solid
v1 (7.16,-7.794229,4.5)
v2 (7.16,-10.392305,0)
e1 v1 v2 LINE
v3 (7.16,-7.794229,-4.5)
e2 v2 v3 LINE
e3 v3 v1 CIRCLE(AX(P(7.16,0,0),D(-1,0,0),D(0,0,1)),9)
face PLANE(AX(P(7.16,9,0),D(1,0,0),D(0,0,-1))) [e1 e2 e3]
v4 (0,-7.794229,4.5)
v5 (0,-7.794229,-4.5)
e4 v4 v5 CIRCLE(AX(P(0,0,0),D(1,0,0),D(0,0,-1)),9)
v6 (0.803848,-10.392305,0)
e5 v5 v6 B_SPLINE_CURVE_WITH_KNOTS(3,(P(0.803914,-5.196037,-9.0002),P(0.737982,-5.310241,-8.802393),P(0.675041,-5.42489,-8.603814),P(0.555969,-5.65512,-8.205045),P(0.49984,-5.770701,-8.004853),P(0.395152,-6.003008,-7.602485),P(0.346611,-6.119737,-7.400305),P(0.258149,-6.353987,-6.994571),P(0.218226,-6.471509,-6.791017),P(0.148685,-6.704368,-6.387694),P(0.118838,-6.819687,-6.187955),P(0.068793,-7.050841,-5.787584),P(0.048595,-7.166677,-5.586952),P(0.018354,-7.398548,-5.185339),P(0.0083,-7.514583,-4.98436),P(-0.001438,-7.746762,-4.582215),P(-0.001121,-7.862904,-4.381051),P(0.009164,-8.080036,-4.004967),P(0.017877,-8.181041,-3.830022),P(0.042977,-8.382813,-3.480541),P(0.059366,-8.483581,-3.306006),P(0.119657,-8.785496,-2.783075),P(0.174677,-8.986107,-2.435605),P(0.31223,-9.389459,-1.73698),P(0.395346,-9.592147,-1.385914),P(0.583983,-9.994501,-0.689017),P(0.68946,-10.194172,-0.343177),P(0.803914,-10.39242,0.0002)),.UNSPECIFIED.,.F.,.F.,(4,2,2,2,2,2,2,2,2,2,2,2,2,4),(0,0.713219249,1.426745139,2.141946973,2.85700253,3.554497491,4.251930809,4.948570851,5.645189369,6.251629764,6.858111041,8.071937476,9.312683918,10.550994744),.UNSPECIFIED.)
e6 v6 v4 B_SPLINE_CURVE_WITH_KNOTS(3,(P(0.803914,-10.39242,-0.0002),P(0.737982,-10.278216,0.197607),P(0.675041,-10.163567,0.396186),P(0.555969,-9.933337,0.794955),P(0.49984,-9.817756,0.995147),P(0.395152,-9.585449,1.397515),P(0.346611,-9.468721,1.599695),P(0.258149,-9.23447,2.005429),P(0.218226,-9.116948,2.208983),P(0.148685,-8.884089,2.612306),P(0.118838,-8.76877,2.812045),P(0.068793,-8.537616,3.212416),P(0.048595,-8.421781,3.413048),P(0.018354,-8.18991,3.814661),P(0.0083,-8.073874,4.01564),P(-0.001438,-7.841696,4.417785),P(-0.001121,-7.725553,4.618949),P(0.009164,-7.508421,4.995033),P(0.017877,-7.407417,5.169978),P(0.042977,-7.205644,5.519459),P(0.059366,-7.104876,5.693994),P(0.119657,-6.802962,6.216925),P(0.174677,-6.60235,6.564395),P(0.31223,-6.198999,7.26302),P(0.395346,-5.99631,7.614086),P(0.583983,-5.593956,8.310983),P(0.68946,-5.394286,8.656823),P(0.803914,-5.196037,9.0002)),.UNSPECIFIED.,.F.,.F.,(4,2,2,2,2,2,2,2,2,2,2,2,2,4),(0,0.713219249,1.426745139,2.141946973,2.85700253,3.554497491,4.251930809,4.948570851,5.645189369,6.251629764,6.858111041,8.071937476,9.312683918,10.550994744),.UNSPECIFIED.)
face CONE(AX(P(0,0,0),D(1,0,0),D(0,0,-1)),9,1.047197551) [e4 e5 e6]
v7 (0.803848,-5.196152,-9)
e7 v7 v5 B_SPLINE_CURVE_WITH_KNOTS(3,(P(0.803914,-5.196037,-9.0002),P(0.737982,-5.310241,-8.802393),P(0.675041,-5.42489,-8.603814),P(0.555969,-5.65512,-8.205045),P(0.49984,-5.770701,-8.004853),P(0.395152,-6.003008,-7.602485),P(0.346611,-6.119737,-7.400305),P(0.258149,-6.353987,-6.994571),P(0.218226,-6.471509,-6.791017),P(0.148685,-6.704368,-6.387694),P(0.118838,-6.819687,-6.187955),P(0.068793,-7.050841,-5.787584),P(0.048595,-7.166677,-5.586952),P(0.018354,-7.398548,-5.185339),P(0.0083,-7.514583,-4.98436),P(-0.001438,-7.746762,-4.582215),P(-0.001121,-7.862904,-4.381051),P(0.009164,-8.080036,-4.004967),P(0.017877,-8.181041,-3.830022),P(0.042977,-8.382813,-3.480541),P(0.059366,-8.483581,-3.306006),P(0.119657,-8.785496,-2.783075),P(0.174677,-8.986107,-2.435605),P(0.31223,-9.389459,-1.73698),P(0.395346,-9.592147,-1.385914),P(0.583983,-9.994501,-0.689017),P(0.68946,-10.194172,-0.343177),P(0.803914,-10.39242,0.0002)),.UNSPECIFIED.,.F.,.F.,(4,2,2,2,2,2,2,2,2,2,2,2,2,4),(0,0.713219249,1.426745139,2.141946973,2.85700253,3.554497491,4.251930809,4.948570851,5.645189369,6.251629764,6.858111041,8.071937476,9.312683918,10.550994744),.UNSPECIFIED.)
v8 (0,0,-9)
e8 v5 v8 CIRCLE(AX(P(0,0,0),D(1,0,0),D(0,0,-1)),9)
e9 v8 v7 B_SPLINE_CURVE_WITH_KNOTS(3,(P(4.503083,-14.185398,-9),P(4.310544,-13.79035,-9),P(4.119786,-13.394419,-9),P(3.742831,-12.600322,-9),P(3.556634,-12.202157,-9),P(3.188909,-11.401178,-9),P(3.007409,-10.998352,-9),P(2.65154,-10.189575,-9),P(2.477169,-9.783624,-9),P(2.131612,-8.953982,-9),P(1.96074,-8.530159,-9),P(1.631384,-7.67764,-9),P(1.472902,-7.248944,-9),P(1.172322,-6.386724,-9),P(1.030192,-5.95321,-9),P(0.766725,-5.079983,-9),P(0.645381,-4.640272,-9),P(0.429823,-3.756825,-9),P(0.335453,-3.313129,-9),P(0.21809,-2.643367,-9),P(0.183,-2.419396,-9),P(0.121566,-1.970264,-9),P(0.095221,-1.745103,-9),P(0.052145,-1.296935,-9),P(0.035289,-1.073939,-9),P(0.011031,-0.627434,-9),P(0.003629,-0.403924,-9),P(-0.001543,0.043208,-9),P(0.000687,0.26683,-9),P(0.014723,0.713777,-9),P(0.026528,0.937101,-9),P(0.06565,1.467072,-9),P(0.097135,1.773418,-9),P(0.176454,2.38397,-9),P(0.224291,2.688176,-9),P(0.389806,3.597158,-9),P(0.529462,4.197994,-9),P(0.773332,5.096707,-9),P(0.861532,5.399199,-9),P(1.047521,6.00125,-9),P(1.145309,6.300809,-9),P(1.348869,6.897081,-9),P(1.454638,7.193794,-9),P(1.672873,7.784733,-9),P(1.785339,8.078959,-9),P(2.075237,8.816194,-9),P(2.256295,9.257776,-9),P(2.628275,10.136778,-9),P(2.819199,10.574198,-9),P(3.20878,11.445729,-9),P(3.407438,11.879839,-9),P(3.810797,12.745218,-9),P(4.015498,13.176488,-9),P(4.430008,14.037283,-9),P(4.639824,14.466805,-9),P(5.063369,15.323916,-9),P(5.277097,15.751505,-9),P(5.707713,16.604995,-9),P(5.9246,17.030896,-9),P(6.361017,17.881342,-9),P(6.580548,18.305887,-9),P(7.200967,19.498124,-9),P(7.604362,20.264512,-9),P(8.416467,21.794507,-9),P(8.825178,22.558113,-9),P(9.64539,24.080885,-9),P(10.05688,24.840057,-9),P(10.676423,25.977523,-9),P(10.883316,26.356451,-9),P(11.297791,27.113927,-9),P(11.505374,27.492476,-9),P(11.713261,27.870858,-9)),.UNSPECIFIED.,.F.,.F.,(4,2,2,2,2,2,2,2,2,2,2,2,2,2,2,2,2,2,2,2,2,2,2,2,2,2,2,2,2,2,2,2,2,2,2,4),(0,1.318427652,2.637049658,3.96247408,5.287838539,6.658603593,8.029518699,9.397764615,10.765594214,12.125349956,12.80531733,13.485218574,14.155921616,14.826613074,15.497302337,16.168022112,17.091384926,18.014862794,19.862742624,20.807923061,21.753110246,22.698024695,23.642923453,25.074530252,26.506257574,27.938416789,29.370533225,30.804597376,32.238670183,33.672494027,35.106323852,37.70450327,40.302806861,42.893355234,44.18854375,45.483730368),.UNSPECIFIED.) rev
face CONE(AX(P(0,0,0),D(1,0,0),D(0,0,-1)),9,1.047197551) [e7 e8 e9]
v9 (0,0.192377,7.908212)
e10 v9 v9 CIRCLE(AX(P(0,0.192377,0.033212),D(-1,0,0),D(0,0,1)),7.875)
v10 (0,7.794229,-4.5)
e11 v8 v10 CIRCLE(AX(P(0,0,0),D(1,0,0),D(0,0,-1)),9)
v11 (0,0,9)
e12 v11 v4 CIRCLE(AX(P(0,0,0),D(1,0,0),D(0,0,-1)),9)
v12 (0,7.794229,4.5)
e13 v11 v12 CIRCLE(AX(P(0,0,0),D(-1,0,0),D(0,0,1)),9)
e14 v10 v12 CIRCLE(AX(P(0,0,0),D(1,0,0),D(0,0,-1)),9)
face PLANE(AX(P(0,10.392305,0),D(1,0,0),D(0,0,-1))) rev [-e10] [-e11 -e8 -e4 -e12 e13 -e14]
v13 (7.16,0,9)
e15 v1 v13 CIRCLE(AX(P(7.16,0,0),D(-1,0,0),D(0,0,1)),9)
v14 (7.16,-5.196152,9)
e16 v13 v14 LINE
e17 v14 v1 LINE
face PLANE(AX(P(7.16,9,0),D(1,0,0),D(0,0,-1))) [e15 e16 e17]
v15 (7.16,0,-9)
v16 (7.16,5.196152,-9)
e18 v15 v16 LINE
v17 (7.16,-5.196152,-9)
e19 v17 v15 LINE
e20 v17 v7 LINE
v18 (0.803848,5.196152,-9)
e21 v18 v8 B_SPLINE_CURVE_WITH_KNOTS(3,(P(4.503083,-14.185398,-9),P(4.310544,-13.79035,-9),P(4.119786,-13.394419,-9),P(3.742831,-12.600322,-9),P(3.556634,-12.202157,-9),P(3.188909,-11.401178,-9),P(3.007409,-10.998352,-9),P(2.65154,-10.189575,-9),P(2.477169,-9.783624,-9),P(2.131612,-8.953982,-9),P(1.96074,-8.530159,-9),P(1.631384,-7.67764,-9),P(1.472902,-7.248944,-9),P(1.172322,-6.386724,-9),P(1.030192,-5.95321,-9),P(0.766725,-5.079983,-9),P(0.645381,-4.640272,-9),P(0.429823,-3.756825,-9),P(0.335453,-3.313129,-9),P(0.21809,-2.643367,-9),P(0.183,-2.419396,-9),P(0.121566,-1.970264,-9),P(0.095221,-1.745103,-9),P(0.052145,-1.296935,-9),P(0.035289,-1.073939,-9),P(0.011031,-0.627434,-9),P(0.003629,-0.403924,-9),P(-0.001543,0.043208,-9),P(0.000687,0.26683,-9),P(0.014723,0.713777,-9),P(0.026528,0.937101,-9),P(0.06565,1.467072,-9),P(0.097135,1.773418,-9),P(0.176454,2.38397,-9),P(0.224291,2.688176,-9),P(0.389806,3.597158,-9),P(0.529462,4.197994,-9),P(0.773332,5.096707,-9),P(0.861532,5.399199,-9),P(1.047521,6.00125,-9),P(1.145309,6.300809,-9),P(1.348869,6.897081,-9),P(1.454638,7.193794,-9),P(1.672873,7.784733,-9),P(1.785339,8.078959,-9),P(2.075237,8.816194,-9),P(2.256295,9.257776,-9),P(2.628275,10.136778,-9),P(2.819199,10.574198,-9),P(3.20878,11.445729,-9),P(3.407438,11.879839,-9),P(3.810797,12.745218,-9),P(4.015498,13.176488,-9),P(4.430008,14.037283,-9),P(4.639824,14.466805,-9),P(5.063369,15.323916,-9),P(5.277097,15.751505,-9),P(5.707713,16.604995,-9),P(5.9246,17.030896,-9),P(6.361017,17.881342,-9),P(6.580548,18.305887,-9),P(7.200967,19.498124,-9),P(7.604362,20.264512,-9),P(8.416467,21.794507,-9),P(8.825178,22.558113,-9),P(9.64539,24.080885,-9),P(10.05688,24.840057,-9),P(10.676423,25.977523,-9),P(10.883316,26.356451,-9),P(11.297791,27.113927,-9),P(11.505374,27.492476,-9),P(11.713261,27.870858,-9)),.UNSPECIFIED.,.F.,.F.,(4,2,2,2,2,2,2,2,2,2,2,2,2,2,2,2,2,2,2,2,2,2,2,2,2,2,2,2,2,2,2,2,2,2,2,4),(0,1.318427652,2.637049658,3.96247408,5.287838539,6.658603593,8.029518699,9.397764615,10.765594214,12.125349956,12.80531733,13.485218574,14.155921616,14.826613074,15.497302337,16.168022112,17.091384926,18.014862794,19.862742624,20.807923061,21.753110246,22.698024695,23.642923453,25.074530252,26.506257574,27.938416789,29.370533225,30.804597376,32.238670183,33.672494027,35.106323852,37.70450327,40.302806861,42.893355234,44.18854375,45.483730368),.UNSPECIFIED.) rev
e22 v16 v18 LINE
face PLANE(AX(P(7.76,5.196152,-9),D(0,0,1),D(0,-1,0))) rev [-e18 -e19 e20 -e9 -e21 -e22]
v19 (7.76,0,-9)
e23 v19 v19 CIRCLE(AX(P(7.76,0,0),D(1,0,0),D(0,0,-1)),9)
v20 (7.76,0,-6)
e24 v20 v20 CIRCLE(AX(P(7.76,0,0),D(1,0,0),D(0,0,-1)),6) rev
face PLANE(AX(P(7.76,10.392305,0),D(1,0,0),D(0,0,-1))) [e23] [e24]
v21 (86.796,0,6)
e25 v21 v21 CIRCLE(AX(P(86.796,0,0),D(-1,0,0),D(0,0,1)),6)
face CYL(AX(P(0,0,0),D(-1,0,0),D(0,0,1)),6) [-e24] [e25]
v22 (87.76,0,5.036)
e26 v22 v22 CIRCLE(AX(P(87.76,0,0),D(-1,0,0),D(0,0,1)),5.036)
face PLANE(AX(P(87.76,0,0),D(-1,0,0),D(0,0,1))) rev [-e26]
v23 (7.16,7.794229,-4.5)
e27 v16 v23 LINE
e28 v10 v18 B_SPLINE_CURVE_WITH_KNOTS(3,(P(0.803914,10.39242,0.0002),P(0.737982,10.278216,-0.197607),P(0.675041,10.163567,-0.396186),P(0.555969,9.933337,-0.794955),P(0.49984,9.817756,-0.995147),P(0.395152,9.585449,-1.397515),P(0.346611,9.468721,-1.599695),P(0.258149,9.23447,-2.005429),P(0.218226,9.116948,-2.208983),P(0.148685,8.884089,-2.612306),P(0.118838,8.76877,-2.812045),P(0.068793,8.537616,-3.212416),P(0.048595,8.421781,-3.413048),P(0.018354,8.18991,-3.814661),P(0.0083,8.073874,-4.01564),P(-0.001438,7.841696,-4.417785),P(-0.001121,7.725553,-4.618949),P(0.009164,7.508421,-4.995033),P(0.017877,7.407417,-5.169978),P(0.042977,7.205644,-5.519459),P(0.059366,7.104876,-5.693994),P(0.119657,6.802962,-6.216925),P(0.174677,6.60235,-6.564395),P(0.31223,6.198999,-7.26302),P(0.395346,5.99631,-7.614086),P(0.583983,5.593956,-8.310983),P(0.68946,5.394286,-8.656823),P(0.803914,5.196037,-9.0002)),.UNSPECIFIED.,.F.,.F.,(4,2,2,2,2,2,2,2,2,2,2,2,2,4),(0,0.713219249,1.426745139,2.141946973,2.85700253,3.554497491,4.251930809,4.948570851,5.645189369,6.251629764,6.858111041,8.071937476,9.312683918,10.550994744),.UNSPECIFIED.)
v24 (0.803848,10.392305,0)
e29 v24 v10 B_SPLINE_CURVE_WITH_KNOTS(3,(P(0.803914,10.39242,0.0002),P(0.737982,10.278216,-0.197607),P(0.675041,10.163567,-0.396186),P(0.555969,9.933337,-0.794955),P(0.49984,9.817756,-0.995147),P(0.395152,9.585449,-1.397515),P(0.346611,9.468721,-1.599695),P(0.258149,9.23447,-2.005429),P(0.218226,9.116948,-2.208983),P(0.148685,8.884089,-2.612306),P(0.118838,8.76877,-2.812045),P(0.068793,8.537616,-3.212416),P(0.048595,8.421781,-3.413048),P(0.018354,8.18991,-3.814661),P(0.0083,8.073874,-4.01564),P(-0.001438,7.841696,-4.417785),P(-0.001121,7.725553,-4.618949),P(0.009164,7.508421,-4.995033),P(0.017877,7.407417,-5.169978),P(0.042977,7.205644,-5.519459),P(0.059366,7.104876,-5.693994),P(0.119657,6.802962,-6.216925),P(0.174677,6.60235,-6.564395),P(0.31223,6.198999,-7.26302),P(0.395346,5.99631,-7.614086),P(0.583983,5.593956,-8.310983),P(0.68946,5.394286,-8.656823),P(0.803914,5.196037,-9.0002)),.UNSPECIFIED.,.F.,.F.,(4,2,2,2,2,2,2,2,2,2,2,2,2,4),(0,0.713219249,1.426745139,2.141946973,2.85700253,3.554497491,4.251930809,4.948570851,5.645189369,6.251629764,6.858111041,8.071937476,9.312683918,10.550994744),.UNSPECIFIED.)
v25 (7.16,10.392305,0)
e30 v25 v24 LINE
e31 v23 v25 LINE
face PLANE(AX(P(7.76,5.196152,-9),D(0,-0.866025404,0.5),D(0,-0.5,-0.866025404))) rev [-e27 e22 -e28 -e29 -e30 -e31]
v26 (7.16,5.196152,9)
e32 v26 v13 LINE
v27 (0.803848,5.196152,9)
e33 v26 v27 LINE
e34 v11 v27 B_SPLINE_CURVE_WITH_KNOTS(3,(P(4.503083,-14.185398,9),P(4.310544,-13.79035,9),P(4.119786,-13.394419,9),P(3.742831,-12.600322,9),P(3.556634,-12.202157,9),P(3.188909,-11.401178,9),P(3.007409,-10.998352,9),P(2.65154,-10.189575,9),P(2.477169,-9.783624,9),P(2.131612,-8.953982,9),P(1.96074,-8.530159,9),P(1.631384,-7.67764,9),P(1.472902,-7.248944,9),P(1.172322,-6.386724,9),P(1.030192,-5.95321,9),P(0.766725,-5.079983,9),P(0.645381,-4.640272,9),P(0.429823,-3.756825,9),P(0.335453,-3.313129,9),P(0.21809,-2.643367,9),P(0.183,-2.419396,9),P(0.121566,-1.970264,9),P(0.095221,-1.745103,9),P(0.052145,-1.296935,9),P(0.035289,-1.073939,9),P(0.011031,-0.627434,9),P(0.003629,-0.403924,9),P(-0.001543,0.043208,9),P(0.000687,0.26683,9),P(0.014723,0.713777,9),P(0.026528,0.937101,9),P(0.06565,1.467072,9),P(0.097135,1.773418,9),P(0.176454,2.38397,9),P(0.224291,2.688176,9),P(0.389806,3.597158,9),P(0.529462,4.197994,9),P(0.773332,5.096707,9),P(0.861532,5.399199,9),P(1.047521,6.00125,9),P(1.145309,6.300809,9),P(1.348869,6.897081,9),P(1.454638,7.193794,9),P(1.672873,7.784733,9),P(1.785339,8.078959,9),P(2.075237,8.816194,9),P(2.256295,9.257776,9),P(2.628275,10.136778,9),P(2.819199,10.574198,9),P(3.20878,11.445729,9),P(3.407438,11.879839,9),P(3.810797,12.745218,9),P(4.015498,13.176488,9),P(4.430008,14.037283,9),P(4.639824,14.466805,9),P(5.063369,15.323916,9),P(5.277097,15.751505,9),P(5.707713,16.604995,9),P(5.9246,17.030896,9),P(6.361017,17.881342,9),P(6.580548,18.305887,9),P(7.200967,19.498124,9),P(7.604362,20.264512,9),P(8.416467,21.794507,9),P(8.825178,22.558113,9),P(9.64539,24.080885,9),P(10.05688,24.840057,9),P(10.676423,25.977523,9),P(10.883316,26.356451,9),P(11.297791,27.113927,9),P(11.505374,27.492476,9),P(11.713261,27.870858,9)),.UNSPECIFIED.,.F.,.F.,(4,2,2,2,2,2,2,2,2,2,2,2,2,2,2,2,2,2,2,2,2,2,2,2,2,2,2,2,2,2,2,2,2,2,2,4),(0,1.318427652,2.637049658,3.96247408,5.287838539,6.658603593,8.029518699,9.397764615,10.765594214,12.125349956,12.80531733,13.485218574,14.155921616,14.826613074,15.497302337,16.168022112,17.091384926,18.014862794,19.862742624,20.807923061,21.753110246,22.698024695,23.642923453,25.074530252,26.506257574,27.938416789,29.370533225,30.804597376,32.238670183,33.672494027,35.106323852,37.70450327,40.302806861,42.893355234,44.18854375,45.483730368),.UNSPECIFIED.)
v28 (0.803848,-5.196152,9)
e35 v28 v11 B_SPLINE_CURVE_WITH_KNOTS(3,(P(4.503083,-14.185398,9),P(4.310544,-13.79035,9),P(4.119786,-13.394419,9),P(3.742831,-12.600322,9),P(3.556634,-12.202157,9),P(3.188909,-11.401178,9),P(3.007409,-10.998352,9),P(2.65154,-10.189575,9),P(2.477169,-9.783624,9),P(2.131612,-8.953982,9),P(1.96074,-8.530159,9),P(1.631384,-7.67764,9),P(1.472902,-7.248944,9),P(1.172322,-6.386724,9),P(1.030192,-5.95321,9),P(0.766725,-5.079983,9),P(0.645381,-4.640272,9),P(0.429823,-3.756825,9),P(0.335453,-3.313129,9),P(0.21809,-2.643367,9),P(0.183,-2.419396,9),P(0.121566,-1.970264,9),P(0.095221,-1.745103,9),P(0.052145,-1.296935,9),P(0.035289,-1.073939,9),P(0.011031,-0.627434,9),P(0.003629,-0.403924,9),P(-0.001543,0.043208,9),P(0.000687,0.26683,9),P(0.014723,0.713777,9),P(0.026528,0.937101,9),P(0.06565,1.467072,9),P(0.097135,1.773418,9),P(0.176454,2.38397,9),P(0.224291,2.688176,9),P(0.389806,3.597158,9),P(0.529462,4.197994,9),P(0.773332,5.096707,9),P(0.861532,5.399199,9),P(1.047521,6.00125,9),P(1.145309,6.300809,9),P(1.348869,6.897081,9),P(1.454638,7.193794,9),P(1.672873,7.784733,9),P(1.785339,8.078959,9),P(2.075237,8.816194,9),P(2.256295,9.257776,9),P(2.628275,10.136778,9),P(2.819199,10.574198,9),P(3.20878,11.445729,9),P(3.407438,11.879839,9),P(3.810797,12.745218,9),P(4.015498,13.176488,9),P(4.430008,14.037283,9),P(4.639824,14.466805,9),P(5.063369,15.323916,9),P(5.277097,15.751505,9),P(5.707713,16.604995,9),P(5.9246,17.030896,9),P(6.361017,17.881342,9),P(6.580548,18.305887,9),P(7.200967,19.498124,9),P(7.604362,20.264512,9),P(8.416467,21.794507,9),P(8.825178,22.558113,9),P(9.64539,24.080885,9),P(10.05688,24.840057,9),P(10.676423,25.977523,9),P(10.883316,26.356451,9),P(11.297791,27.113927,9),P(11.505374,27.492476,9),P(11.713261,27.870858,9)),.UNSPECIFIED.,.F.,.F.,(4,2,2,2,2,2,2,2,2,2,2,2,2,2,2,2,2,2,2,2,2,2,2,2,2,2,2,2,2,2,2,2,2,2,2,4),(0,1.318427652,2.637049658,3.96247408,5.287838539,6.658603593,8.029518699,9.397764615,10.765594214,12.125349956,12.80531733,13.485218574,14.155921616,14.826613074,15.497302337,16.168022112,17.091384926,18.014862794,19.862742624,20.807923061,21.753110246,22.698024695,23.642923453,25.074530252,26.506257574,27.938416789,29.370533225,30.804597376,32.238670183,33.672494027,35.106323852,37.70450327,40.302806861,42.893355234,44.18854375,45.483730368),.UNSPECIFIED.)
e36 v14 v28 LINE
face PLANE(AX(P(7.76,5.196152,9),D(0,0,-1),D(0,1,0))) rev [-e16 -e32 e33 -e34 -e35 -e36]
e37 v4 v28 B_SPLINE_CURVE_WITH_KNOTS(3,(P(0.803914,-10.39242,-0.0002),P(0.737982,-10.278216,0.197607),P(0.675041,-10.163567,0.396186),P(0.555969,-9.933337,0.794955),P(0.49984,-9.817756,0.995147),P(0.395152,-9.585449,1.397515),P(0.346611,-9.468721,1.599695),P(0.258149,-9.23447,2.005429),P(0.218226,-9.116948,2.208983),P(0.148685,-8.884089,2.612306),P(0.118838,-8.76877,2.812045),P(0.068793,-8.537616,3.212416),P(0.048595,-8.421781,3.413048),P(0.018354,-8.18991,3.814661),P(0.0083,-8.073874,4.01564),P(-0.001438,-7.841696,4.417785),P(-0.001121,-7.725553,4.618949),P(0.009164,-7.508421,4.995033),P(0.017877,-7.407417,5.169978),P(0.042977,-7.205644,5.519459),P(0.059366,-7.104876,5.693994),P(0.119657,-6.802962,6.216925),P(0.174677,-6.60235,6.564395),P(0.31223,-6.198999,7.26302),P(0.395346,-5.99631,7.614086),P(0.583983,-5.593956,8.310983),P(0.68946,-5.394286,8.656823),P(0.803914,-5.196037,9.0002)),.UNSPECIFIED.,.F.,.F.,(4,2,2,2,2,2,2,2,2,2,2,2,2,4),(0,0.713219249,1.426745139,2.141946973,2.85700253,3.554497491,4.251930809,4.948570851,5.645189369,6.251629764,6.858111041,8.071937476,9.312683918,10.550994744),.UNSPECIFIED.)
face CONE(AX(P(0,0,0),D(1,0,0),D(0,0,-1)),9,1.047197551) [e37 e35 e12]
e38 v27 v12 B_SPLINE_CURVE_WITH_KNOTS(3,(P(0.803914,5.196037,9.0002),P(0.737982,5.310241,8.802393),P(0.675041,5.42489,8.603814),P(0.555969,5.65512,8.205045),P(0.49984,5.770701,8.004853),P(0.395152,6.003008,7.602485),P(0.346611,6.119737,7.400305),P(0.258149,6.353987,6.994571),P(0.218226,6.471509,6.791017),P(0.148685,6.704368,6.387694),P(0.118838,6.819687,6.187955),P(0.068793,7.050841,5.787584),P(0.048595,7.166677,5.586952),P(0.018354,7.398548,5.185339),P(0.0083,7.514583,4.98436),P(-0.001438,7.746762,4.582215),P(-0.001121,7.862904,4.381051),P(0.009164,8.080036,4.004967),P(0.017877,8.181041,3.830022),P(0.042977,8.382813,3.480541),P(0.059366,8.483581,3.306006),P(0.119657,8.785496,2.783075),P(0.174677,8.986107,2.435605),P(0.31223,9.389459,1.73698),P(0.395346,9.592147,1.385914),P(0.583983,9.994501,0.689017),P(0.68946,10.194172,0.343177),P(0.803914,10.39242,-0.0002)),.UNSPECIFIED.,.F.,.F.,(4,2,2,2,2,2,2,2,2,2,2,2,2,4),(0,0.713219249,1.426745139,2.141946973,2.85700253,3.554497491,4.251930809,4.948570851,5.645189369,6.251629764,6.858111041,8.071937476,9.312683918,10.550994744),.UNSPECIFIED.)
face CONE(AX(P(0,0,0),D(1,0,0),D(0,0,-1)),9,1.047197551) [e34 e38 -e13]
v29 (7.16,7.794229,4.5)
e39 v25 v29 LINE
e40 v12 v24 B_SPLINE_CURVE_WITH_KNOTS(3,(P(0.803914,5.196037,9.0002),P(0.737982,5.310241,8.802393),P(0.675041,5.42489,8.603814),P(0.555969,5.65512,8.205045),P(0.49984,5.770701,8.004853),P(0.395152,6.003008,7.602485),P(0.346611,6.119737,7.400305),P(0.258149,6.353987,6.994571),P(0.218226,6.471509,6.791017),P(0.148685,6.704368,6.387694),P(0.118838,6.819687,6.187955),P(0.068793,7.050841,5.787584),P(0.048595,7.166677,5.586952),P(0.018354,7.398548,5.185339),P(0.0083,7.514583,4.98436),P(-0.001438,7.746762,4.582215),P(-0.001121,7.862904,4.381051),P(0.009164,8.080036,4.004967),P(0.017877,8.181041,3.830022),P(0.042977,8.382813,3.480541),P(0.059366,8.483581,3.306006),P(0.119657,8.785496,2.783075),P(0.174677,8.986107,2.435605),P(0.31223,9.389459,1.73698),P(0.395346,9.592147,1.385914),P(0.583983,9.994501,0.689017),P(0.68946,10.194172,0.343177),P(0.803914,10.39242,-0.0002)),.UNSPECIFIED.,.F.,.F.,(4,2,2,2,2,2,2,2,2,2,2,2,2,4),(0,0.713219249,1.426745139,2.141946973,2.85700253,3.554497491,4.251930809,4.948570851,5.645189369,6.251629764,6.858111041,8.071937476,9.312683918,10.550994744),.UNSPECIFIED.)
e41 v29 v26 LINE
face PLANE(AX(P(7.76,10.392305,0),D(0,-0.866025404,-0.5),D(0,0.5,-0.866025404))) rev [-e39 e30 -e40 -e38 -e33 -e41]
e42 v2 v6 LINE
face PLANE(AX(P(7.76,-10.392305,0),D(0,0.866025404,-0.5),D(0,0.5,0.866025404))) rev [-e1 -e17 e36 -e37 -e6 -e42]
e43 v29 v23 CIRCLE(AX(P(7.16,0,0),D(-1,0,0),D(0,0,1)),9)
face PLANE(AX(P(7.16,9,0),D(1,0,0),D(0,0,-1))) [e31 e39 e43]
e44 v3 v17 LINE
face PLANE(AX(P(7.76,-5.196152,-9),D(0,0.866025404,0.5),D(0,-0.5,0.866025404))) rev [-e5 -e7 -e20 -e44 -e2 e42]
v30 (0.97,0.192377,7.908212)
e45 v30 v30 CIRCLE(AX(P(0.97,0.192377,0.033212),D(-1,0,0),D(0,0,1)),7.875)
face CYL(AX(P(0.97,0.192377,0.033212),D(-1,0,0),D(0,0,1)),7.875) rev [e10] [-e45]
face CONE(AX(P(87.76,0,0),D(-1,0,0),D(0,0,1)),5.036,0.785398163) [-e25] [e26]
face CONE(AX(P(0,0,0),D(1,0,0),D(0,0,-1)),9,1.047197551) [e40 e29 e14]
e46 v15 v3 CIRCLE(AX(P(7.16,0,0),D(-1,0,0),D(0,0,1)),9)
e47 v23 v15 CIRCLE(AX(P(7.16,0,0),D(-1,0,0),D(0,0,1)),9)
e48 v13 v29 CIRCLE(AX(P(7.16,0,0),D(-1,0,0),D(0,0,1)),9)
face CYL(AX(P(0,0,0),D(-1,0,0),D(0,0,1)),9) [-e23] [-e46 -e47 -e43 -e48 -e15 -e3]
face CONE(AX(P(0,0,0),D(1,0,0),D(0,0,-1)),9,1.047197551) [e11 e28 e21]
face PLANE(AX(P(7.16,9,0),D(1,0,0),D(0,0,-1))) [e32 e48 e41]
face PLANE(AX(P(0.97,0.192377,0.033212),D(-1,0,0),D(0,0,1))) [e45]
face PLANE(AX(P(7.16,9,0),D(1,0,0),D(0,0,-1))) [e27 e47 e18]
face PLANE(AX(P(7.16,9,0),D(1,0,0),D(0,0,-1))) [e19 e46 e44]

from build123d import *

# Parameters (mm, degrees)
BASEHEAD_DEPTH   = 7.76
INDENT_OUTLINE_R = 7.875
INDENT_DEPTH     = 0.97
SKETCH4_W        = 0.6
SKETCH4_H        = 11.392304845


# Read off the part's stored shape, not the designer's step: Indent
with BuildPart() as part:
    # Sketch1 → BaseHead (new body)
    with BuildSketch(Plane(origin=(0, 0, 0), x_dir=(0, 0, -1), z_dir=(1, 0, 0))):
        Polygon((9, 5.196152423), (9, -5.196152423), (0, -10.392304845), (-9, -5.196152423), (-9, 5.196152423), (0, 10.392304845), align=None)
    extrude(amount=BASEHEAD_DEPTH)

    # BodySke → BaseBody (revolve)
    with BuildSketch(Plane.XY, mode=Mode.PRIVATE) as basebody_sk:
        Polygon((0, 0), (87.76, 0), (87.76, 5.036), (86.796, 6), (0, 6), align=None)
    revolve(basebody_sk.sketch.rotate(Axis((0, 0, 0), (1, 0, 0)), 90), axis=Axis((0, 0, 0), (1, 0, 0)))

    # Indent outline → Indent (cut)
    with BuildSketch(Plane.YZ):
        with Locations((0.192376607, 0.033212245)):
            Circle(INDENT_OUTLINE_R)
    extrude(amount=INDENT_DEPTH, mode=Mode.SUBTRACT)

    # Sketch3 → HeadChamfer (revolve, cut)
    with BuildSketch(Plane.XY):
        Polygon((0, 9), (3.690598923, 15.392304845), (3.690598923, 20.392304845), (-10, 20.392304845), (-10, 9), align=None)
    revolve(axis=Axis((0, 0, 0), (1, 0, 0)), mode=Mode.SUBTRACT)

    # Sketch4 → BearingFace (revolve, cut)
    with BuildSketch(Plane.XY, mode=Mode.PRIVATE) as bearingface_sk:
        with Locations((7.46, 14.696152423)):
            Rectangle(SKETCH4_W, SKETCH4_H)
    revolve(bearingface_sk.sketch.rotate(Axis((0, 0, 0), (1, 0, 0)), 270), axis=Axis((0, 0, 0), (1, 0, 0)), mode=Mode.SUBTRACT)


solid = part.part
